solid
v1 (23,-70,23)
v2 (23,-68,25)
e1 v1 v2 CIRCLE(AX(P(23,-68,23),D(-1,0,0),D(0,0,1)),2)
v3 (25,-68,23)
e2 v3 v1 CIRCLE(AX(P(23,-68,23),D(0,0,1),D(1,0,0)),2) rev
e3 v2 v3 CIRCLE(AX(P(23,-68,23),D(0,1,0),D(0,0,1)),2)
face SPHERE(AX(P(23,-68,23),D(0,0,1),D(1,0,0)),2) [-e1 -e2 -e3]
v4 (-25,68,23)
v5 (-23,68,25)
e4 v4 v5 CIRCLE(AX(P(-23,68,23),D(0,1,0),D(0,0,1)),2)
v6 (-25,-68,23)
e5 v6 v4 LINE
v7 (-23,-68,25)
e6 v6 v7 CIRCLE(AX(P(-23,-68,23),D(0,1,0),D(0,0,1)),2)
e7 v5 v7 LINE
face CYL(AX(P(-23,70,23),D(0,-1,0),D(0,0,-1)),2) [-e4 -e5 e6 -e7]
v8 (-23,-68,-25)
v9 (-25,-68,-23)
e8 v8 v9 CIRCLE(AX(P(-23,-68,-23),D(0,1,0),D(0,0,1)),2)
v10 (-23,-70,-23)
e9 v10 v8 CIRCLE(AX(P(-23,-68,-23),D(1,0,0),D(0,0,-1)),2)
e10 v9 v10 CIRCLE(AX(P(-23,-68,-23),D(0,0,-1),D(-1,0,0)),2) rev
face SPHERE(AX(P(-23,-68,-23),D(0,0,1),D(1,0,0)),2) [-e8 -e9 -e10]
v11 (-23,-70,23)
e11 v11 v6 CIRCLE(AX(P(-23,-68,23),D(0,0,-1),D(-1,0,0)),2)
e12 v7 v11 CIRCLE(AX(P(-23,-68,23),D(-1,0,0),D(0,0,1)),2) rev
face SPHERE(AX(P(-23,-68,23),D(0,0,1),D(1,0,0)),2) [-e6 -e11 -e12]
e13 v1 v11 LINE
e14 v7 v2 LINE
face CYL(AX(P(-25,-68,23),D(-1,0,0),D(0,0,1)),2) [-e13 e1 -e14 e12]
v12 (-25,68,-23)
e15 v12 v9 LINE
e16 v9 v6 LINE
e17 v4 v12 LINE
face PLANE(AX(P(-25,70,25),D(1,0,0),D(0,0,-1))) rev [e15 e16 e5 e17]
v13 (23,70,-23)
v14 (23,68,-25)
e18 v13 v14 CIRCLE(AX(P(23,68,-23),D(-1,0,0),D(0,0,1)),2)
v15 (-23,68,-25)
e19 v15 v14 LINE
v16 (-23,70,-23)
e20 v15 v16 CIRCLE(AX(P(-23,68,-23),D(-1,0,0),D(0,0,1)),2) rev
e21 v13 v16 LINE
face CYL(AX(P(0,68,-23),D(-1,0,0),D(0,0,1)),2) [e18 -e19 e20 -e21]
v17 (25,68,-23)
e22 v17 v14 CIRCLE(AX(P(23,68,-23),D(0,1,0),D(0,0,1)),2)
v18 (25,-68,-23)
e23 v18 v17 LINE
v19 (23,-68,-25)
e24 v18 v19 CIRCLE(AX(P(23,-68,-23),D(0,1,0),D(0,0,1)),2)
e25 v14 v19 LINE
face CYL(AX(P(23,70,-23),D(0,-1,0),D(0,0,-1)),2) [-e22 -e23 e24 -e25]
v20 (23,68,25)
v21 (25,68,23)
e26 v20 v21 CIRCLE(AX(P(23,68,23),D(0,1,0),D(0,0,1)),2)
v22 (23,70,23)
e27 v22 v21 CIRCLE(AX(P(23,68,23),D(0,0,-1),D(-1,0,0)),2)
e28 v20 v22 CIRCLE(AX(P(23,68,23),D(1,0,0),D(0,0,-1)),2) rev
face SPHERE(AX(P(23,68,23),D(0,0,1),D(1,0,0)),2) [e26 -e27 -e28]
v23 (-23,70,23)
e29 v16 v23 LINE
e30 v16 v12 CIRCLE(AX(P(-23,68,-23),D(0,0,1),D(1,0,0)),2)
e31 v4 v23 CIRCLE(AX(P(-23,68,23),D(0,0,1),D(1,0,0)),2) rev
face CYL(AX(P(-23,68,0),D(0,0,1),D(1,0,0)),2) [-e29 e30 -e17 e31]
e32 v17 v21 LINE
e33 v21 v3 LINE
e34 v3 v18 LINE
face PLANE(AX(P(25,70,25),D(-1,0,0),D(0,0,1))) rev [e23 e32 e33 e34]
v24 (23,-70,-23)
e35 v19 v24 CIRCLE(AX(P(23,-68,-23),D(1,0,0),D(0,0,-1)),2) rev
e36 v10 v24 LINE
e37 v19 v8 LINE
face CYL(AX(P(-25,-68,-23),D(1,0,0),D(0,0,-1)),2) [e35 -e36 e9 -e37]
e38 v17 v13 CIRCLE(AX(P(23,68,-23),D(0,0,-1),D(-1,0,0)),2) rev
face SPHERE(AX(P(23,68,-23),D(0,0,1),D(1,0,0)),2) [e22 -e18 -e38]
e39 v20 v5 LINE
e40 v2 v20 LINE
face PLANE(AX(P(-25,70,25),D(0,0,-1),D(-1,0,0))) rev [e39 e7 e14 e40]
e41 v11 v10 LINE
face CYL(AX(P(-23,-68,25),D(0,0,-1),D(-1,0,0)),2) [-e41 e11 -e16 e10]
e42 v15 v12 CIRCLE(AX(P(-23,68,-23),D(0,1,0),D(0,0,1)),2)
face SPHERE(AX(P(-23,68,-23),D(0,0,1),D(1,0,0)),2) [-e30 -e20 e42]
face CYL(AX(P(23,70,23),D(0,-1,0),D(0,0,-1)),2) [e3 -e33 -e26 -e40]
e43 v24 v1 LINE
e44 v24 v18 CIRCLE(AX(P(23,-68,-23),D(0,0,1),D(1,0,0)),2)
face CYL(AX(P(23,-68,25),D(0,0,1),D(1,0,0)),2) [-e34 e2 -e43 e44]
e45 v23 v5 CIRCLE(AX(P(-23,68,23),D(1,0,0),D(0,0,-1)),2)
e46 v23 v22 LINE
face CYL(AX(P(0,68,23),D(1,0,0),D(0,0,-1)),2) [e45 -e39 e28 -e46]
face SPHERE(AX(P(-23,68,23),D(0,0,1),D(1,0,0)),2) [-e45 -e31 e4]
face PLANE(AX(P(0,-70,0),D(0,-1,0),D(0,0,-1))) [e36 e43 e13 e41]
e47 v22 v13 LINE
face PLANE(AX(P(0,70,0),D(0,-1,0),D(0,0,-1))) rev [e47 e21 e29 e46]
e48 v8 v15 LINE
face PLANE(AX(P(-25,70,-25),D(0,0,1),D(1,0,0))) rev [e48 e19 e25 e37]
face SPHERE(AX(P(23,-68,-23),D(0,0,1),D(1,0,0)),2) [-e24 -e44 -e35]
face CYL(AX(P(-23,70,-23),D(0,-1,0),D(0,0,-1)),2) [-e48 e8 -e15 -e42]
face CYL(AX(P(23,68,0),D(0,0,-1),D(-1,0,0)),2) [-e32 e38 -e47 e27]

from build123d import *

# Parameters (mm, degrees)
SKETCH1_W           = 50
SKETCH1_H           = 50
BOSS_EXTRUDE1_DEPTH = 70
FILLET1_R           = 2
FILLET2_R           = 2


with BuildPart() as part:
    # Sketch1 → Boss-Extrude1 (new, symmetric)
    with BuildSketch(Plane(origin=(0, 0, 0), x_dir=(1, 0, 0), z_dir=(0, 1, 0))):
        Rectangle(SKETCH1_W, SKETCH1_H)
    extrude(amount=BOSS_EXTRUDE1_DEPTH, both=True)

    # Fillet1
    fillet1_edges = [part.edges().sort_by_distance(p)[0] for p in [
        (-25, 70, 0),
        (0, 70, 25),
        (25, 70, 0),
        (0, -70, 25),
        (-25, -70, 0),
        (0, -70, -25),
        (25, -70, 0),
        (0, 70, -25),
    ]]
    fillet(fillet1_edges, radius=FILLET1_R)

    # Fillet2
    # the kernel refuses this fillet: 2 mm, written as the material it takes off along each edge
    with BuildSketch(Plane(origin=(23, -68, 23), x_dir=(1, 0, 0), z_dir=(0, 0, 1))) as fillet2_piece_1_section:
        Polygon((0, 0), (FILLET2_R, 0), (FILLET2_R, -FILLET2_R), (0, -FILLET2_R), align=None)
    fillet2_piece_1 = extrude(amount=FILLET2_R, mode=Mode.PRIVATE)
    fillet2_piece_1 = fillet2_piece_1 - Plane(origin=(23, -68, 23), x_dir=(-0.7071067811865475, 0.7071067811865475, 0), z_dir=(0, 0, 1)) * Sphere(FILLET2_R, mode=Mode.PRIVATE)
    add(fillet2_piece_1, mode=Mode.SUBTRACT)
    with BuildSketch(Plane(origin=(-23, -68, 23), x_dir=(-1, 0, 0), z_dir=(0, 0, 1))) as fillet2_piece_2_section:
        Polygon((0, 0), (FILLET2_R, 0), (FILLET2_R, FILLET2_R), (0, FILLET2_R), align=None)
    fillet2_piece_2 = extrude(amount=FILLET2_R, mode=Mode.PRIVATE)
    fillet2_piece_2 = fillet2_piece_2 - Plane(origin=(-23, -68, 23), x_dir=(0.7071067811865475, 0.7071067811865475, 0), z_dir=(0, 0, 1)) * Sphere(FILLET2_R, mode=Mode.PRIVATE)
    add(fillet2_piece_2, mode=Mode.SUBTRACT)
    with BuildSketch(Plane(origin=(23, -68, -23), x_dir=(0, 0, -1), z_dir=(1, 0, 0))) as fillet2_piece_3_section:
        Polygon((0, 0), (FILLET2_R, 0), (FILLET2_R, -FILLET2_R), (0, -FILLET2_R), align=None)
    fillet2_piece_3 = extrude(amount=FILLET2_R, mode=Mode.PRIVATE)
    fillet2_piece_3 = fillet2_piece_3 - Plane(origin=(23, -68, -23), x_dir=(0, 0.7071067811865475, 0.7071067811865475), z_dir=(1, 0, 0)) * Sphere(FILLET2_R, mode=Mode.PRIVATE)
    add(fillet2_piece_3, mode=Mode.SUBTRACT)
    with BuildSketch(Plane(origin=(-23, -68, -23), x_dir=(0, 0, -1), z_dir=(-1, 0, 0))) as fillet2_piece_4_section:
        Polygon((0, 0), (FILLET2_R, 0), (FILLET2_R, FILLET2_R), (0, FILLET2_R), align=None)
    fillet2_piece_4 = extrude(amount=FILLET2_R, mode=Mode.PRIVATE)
    fillet2_piece_4 = fillet2_piece_4 - Plane(origin=(-23, -68, -23), x_dir=(0, 0.7071067811865475, 0.7071067811865475), z_dir=(-1, 0, 0)) * Sphere(FILLET2_R, mode=Mode.PRIVATE)
    add(fillet2_piece_4, mode=Mode.SUBTRACT)
    with BuildSketch(Plane(origin=(-23, 68, -23), x_dir=(0, 0, -1), z_dir=(-1, 0, 0))) as fillet2_piece_5_section:
        Polygon((0, 0), (FILLET2_R, 0), (FILLET2_R, -FILLET2_R), (0, -FILLET2_R), align=None)
    fillet2_piece_5 = extrude(amount=FILLET2_R, mode=Mode.PRIVATE)
    fillet2_piece_5 = fillet2_piece_5 - Plane(origin=(-23, 68, -23), x_dir=(0, -0.7071067811865475, 0.7071067811865475), z_dir=(-1, 0, 0)) * Sphere(FILLET2_R, mode=Mode.PRIVATE)
    add(fillet2_piece_5, mode=Mode.SUBTRACT)
    with BuildSketch(Plane(origin=(23, 68, -23), x_dir=(0, 0, -1), z_dir=(1, 0, 0))) as fillet2_piece_6_section:
        Polygon((0, 0), (FILLET2_R, 0), (FILLET2_R, FILLET2_R), (0, FILLET2_R), align=None)
    fillet2_piece_6 = extrude(amount=FILLET2_R, mode=Mode.PRIVATE)
    fillet2_piece_6 = fillet2_piece_6 - Plane(origin=(23, 68, -23), x_dir=(0, -0.7071067811865475, 0.7071067811865475), z_dir=(1, 0, 0)) * Sphere(FILLET2_R, mode=Mode.PRIVATE)
    add(fillet2_piece_6, mode=Mode.SUBTRACT)
    with BuildSketch(Plane(origin=(-23, 68, 23), x_dir=(-1, 0, 0), z_dir=(0, 0, 1))) as fillet2_piece_7_section:
        Polygon((0, 0), (FILLET2_R, 0), (FILLET2_R, -FILLET2_R), (0, -FILLET2_R), align=None)
    fillet2_piece_7 = extrude(amount=FILLET2_R, mode=Mode.PRIVATE)
    fillet2_piece_7 = fillet2_piece_7 - Plane(origin=(-23, 68, 23), x_dir=(0.7071067811865475, -0.7071067811865475, 0), z_dir=(0, 0, 1)) * Sphere(FILLET2_R, mode=Mode.PRIVATE)
    add(fillet2_piece_7, mode=Mode.SUBTRACT)
    with BuildSketch(Plane(origin=(23, 68, 23), x_dir=(1, 0, 0), z_dir=(0, 0, 1))) as fillet2_piece_8_section:
        Polygon((0, 0), (FILLET2_R, 0), (FILLET2_R, FILLET2_R), (0, FILLET2_R), align=None)
    fillet2_piece_8 = extrude(amount=FILLET2_R, mode=Mode.PRIVATE)
    fillet2_piece_8 = fillet2_piece_8 - Plane(origin=(23, 68, 23), x_dir=(-0.7071067811865475, -0.7071067811865475, 0), z_dir=(0, 0, 1)) * Sphere(FILLET2_R, mode=Mode.PRIVATE)
    add(fillet2_piece_8, mode=Mode.SUBTRACT)
    with BuildSketch(Plane(origin=(-25, 68, -25), x_dir=(0, 0, 1), z_dir=(0, -1, 0)), Plane(origin=(25, -68, -25), x_dir=(0, 0, 1), z_dir=(0, 1, 0)), Plane(origin=(-25, 68, 25), x_dir=(1, 0, 0), z_dir=(0, -1, 0)), Plane(origin=(25, -68, 25), x_dir=(-1, 0, 0), z_dir=(0, 1, 0))) as fillet2_piece_9:
        with BuildLine():
            CenterArc((FILLET2_R, -FILLET2_R), FILLET2_R, 90, 90)
            Line((0, -FILLET2_R), (0, 0))
            Line((0, 0), (FILLET2_R, 0))
        make_face()
    extrude(amount=136, mode=Mode.SUBTRACT)


solid = part.part
